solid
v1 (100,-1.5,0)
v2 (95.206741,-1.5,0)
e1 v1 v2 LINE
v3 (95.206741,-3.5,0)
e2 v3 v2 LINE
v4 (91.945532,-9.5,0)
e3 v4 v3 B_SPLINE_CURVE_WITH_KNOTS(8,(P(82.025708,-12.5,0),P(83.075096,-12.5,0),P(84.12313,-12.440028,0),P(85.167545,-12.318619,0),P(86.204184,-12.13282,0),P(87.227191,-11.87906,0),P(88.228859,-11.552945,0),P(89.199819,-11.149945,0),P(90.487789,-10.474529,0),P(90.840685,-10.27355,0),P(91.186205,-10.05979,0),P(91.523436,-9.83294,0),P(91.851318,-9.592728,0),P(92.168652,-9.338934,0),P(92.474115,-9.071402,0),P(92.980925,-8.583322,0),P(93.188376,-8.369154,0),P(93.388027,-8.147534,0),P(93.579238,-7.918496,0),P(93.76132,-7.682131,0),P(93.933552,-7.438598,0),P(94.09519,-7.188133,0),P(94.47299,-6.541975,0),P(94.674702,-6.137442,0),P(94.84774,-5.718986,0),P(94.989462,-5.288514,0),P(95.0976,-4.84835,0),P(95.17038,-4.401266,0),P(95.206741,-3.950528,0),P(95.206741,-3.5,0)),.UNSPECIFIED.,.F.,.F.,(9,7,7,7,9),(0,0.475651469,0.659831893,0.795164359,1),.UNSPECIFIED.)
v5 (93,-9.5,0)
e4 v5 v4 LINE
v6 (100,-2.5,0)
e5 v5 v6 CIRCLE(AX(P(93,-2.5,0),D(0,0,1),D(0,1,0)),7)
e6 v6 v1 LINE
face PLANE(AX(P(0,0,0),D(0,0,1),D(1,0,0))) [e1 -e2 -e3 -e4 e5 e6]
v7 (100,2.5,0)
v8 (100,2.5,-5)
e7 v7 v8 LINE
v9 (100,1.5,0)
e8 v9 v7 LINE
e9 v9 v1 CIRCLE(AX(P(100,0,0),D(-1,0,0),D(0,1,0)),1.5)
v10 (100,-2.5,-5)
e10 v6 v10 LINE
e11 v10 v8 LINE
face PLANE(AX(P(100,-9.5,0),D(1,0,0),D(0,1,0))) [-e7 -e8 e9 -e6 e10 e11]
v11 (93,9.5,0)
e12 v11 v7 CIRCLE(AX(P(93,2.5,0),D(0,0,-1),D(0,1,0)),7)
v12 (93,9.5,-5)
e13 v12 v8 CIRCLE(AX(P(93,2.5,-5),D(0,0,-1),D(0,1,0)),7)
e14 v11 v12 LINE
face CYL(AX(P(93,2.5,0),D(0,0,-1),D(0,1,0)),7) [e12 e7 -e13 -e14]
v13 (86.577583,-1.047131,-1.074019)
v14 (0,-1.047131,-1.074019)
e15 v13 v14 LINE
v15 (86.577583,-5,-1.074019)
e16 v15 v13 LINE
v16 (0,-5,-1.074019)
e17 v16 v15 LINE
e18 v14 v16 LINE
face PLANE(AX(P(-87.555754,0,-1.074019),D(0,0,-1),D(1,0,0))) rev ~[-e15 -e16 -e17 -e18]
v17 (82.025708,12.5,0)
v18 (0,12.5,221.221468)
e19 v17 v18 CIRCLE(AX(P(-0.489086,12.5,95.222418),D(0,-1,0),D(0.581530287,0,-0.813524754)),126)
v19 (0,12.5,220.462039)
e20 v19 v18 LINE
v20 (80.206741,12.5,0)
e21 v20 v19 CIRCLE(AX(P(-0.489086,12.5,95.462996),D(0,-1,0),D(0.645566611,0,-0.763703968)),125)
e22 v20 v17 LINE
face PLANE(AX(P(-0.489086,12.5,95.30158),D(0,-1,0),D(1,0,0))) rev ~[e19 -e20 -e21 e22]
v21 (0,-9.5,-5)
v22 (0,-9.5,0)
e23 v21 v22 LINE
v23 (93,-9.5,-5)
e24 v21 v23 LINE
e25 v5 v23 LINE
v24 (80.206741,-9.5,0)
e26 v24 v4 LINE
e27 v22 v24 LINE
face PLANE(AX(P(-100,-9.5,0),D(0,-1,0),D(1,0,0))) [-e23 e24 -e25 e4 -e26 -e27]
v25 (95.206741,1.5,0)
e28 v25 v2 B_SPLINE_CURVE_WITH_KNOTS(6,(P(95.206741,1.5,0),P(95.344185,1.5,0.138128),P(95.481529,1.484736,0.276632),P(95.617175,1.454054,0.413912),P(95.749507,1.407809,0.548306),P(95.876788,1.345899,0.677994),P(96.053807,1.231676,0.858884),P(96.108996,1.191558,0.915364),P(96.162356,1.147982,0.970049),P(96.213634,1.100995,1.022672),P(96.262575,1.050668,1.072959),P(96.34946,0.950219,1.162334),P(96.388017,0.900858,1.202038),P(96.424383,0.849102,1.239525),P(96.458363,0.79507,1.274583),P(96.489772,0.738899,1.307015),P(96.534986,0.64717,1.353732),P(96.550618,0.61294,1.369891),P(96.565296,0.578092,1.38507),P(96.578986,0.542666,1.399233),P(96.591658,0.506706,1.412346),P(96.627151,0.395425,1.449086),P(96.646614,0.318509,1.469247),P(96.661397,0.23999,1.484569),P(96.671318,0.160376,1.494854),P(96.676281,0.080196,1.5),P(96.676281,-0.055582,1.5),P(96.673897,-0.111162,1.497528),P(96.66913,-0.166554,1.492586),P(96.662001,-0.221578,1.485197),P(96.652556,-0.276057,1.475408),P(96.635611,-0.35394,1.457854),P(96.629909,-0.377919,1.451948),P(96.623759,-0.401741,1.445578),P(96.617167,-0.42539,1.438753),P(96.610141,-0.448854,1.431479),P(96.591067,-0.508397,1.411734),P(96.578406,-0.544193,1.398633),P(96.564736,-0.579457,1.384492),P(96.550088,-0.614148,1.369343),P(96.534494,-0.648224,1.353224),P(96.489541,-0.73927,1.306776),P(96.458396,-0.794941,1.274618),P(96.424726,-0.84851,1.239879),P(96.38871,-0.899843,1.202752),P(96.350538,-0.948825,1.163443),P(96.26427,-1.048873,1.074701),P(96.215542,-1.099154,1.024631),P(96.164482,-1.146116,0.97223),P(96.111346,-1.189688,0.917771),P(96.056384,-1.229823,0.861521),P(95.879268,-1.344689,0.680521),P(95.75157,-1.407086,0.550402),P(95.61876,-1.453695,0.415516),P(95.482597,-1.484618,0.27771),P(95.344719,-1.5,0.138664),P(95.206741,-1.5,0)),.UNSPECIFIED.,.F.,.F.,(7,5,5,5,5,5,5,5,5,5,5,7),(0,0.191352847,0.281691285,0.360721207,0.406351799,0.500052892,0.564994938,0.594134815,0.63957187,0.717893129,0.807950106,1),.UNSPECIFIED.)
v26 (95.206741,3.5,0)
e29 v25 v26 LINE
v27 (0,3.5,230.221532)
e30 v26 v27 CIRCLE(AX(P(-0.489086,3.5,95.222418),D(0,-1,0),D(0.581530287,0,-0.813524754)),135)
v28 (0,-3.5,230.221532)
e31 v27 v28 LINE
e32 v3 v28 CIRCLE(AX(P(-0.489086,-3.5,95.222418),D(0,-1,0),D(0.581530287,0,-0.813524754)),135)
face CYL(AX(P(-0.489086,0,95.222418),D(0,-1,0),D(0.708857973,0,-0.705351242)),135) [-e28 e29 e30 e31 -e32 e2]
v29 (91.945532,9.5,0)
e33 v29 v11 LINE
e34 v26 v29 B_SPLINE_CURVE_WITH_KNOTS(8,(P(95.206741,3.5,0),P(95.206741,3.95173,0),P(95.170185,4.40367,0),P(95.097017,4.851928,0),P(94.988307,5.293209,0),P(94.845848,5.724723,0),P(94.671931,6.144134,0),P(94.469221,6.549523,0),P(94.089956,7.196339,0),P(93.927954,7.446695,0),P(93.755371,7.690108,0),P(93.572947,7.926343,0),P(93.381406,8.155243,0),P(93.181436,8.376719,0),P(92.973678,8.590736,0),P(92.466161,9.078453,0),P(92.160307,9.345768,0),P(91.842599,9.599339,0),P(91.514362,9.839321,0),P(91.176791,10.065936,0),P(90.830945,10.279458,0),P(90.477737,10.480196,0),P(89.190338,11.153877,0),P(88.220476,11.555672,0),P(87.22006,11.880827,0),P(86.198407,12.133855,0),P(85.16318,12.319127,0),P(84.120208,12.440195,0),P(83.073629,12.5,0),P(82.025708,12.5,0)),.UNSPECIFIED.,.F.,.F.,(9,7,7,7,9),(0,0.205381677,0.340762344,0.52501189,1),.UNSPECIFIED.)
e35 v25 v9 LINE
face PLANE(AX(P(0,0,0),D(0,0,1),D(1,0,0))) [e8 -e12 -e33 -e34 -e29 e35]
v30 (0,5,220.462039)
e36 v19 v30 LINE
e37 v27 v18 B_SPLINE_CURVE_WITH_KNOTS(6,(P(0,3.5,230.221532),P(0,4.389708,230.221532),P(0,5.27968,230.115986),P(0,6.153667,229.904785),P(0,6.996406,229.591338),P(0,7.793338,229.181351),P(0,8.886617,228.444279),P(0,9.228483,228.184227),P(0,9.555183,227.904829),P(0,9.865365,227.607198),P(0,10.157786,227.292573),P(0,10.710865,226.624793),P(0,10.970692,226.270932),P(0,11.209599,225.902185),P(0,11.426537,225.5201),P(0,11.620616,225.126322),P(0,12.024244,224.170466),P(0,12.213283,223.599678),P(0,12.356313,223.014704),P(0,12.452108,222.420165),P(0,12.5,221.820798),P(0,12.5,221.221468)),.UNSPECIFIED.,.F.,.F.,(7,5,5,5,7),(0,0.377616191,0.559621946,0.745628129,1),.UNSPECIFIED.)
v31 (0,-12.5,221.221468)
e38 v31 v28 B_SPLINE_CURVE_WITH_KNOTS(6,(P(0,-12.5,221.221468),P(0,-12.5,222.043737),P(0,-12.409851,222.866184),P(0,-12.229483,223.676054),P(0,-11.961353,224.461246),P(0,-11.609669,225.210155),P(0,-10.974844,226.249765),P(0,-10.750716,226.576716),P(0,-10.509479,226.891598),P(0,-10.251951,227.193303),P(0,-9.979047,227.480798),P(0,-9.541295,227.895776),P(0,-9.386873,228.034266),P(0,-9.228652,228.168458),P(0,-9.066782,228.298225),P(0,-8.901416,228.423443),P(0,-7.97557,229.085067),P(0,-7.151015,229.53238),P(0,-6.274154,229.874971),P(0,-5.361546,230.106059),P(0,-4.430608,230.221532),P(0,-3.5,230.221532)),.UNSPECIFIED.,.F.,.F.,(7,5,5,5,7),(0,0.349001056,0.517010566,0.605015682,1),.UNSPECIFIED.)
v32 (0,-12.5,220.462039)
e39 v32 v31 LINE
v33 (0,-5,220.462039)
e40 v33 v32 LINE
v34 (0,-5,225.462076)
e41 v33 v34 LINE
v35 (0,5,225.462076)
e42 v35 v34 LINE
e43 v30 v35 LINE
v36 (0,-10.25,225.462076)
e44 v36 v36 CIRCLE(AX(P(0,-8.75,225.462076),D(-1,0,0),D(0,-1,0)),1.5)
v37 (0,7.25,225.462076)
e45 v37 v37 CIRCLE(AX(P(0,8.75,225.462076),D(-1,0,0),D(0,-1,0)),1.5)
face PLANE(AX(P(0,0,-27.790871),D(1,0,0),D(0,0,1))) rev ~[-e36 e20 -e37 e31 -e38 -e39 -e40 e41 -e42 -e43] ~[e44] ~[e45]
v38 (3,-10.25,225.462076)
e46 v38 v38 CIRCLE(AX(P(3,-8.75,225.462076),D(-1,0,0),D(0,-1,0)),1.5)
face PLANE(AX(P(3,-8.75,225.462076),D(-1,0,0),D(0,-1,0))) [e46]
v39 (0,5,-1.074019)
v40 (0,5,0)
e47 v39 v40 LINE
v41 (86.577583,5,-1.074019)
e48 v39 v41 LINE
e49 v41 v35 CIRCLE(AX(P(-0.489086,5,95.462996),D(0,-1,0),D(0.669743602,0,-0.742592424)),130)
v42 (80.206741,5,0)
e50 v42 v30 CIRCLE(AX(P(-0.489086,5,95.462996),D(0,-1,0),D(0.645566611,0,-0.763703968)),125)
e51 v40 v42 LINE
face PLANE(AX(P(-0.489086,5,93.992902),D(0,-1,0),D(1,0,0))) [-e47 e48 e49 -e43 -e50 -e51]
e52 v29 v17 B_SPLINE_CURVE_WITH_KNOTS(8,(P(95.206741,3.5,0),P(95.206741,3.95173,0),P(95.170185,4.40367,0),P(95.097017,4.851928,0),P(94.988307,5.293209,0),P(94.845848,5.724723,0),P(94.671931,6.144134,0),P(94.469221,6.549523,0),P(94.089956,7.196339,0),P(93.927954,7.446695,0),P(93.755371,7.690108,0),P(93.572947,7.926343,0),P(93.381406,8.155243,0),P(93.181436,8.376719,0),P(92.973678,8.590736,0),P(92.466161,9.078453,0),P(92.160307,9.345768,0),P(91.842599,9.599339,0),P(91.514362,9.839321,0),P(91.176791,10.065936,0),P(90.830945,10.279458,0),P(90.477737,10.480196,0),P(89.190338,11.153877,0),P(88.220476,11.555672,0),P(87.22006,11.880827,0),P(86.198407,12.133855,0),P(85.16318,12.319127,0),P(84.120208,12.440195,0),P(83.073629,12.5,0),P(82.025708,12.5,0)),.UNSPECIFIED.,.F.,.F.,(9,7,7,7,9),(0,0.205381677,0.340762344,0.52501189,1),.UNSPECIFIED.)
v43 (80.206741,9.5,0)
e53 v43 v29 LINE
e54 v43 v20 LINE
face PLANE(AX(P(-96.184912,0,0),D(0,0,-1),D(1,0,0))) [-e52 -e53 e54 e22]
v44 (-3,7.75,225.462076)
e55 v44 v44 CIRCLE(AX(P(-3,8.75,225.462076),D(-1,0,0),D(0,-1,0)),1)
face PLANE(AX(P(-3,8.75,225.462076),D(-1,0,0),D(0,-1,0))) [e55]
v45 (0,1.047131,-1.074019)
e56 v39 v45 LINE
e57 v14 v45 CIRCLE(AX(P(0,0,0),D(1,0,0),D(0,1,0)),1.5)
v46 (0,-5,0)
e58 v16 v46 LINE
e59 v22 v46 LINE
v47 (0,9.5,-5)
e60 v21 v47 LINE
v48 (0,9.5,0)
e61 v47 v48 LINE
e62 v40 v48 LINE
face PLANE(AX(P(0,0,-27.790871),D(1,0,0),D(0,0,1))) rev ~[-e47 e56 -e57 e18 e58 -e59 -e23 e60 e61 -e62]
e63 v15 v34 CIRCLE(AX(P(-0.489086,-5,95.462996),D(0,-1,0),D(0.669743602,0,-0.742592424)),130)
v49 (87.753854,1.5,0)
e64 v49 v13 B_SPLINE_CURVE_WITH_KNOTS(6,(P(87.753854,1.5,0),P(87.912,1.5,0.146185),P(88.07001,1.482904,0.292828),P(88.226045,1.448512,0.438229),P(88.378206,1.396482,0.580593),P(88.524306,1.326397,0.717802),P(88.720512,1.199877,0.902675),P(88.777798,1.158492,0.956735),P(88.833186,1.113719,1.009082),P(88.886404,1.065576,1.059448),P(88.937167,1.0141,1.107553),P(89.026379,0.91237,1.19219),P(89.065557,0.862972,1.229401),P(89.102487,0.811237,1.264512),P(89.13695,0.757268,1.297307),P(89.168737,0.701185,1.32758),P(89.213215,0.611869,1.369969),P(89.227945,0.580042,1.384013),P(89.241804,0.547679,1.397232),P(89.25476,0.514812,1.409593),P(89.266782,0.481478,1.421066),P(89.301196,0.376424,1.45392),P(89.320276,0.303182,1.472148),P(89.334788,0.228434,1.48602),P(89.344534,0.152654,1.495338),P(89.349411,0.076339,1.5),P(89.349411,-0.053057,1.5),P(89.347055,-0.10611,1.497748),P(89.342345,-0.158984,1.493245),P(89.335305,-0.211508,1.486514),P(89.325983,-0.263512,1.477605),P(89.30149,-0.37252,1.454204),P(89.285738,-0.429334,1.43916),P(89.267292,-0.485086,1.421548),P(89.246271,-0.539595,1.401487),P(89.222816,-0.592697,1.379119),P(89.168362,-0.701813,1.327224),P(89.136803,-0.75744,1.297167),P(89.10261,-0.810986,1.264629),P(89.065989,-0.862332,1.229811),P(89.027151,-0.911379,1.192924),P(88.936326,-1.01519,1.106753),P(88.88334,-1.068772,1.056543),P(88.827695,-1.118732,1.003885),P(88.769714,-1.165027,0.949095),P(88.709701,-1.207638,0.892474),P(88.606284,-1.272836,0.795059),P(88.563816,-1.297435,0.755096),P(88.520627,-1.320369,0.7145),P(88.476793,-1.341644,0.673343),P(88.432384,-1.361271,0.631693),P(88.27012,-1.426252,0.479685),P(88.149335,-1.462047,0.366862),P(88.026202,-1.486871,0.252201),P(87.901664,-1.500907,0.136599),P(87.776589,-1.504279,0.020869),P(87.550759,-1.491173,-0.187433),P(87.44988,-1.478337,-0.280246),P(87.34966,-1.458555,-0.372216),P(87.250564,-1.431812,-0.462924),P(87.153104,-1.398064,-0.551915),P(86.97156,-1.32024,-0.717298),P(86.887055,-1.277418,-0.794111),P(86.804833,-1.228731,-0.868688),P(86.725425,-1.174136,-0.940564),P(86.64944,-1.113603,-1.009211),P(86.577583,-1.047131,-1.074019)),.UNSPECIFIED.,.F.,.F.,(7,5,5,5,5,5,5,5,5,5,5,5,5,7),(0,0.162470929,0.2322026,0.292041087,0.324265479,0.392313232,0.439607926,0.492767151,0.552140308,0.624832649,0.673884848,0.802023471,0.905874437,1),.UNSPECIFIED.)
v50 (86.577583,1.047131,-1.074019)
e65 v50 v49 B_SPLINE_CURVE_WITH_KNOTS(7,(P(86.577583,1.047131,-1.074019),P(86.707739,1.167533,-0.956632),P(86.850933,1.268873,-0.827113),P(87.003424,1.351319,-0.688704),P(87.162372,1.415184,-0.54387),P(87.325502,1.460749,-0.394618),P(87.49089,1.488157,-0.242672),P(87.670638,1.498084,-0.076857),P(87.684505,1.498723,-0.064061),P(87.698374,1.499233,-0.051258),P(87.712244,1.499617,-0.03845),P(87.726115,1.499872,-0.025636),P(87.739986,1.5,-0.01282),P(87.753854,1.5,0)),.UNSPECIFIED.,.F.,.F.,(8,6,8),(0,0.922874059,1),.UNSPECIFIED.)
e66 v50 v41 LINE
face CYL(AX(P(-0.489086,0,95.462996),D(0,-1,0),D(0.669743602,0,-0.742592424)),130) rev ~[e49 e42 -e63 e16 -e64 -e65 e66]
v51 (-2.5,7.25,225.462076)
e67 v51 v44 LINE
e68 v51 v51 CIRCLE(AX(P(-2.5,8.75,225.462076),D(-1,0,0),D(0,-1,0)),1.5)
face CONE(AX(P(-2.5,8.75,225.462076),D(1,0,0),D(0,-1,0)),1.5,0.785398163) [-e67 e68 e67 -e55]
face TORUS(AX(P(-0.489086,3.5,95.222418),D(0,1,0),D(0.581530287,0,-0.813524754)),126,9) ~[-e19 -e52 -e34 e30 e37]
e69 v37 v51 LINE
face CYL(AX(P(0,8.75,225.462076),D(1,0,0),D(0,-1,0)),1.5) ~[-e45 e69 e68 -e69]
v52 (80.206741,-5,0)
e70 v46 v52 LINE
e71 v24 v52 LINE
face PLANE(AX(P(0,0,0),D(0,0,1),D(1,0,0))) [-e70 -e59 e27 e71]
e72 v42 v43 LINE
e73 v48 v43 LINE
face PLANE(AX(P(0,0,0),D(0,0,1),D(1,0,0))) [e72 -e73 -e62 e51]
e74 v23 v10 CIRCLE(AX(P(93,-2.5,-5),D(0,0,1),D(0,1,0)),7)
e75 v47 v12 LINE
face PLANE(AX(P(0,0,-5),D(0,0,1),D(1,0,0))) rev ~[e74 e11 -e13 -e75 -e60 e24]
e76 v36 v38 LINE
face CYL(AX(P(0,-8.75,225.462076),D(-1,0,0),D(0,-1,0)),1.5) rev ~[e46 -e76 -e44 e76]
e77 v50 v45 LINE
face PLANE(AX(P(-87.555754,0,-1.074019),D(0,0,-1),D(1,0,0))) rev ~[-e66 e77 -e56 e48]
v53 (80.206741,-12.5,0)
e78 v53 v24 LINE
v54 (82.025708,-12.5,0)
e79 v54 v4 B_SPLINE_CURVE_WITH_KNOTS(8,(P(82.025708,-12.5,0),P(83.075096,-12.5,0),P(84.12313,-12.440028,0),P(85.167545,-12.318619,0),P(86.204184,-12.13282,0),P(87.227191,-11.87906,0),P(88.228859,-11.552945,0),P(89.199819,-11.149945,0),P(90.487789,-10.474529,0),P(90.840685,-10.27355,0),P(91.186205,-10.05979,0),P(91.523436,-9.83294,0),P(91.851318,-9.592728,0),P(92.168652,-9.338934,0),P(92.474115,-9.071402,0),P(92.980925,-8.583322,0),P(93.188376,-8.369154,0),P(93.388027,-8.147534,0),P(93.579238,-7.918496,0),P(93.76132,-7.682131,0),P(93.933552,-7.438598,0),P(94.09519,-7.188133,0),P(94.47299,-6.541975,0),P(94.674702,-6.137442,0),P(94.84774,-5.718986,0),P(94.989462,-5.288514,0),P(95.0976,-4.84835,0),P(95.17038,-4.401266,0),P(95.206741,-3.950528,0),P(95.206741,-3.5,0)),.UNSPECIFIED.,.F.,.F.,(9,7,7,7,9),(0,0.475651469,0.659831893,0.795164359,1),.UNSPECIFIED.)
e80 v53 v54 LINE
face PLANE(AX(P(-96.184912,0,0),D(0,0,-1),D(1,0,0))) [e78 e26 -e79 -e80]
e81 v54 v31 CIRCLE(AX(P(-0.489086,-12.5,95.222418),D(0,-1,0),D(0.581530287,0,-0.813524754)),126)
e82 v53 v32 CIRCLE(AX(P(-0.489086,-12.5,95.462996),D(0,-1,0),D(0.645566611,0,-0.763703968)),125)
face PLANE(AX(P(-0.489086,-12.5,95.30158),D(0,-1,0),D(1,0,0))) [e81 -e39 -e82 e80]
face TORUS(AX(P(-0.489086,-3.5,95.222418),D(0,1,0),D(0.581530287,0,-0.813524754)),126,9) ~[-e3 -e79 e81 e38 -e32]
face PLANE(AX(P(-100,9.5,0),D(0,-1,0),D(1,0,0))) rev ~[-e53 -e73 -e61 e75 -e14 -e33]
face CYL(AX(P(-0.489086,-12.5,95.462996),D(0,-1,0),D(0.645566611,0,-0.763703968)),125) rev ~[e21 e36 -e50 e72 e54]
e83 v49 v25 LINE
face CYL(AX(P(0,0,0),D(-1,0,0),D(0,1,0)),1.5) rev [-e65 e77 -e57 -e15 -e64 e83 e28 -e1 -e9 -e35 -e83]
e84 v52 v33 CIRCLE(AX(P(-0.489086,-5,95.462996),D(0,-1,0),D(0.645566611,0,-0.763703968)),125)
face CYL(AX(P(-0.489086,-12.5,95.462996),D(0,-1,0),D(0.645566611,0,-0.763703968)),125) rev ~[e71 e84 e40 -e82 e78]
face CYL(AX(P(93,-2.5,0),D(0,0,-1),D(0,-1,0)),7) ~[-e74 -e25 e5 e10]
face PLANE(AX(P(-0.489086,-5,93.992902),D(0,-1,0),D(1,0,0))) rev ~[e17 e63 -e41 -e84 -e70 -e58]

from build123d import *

# Parameters (mm, degrees)
F1_DEPTH     = 12.5
F3_DEPTH     = 145
F4_W         = 200
F4_H         = 19
F5_DEPTH     = 5
F7_DEPTH     = 5
F8_R         = 1
F9_DEPTH     = 135.4900855741
F11_T3_ANGLE = 288.8835060345
F11_T7_ANGLE = 288.8835060345
F12_W        = 164.3678992987
F12_H        = 299.086984247
F13_DEPTH    = 15
F14_R        = 1.5
F15_DEPTH    = 3
F16_R        = 1.5
F17_DEPTH    = 3
F18_SIZE     = 0.5
F19_R        = 1.5
F20_DEPTH    = 134.5119145259
F21_R        = 7


# Not quite as in the source:
# - a fillet or chamfer that OpenCascade refuses, or shapes differently, is made with other operations: its cross-section is extruded or revolved along the edge and cut away or added


with BuildPart() as f1:
    # F0 (on Front) → F1 (new body, symmetric)
    with BuildSketch(Plane.XZ):
        with BuildLine():
            ThreePointArc((95.206740787, 0), (-0.4890855741, 230.2224176182), (-96.1849119353, 0))
            Line((-96.1849119353, 0), (95.206740787, 0))
        make_face()
    extrude(amount=F1_DEPTH, both=True)

    # F2 (on face) → F3 (cut, symmetric)
    with BuildSketch(Plane.XZ.offset(12.5)):
        with BuildLine():
            ThreePointArc((80.206740787, 0), (-0.4890855741, 220.4629960136), (-81.1849119353, 0))
            Line((-81.1849119353, 0), (80.206740787, 0))
        make_face()
    extrude(amount=F3_DEPTH, both=True, mode=Mode.SUBTRACT)

    # F4 (on Top) → F5 (join)
    with BuildSketch(Plane.XY):
        Rectangle(F4_W, F4_H)
    extrude(amount=-F5_DEPTH)

    # F6 (on Front) → F7 (cut, symmetric)
    with BuildSketch(Plane.XZ):
        with BuildLine():
            ThreePointArc((86.5775826458, -1.0740190898), (-0.4890855741, 225.4629960136), (-87.5557537941, -1.0740190898))
            Line((-87.5557537941, -1.0740190898), (86.5775826458, -1.0740190898))
        make_face()
    extrude(amount=F7_DEPTH, both=True, mode=Mode.SUBTRACT)

    # F8 (on Right) → F9 (cut, through all)
    with BuildSketch(Plane.YZ):
        Circle(F8_R)
    extrude(amount=-F9_DEPTH, mode=Mode.SUBTRACT)

    # F11: fillet of radius 9 on 2 edges, made by hand


with BuildPart() as f11_tool1:
    # F11_s2 → F11_t3 (revolve)
    with BuildSketch(Plane(origin=(44.7250174756, 0, 31.9706955431), x_dir=(0, 1, 0), z_dir=(-0.8135247542, 0, -0.5815302867))):
        with BuildLine():
            ThreePointArc((-12.5, 48.2497880385), (-9.8639610307, 54.6137490692), (-3.5, 57.2497880385))
            Line((-3.5, 57.2497880385), (-3.5, 57.4297880385))
            Line((-3.5, 57.4297880385), (-12.68, 57.4297880385))
            Line((-12.68, 57.4297880385), (-12.68, 48.2497880385))
            Line((-12.68, 48.2497880385), (-12.5, 48.2497880385))
        make_face()
    revolve(axis=Axis((-0.4890855741, -12.5, 95.2224176182), (0, -1, 0)), revolution_arc=F11_T3_ANGLE)

    split(bisect_by=Plane.XY, keep=Keep.TOP)


with BuildPart() as f11_tool5:
    # F11_s6 → F11_t7 (revolve)
    with BuildSketch(Plane(origin=(44.7250174756, 0, 31.9706955431), x_dir=(0, 1, 0), z_dir=(-0.8135247542, 0, -0.5815302867))):
        with BuildLine():
            ThreePointArc((3.5, 57.2497880385), (9.8639610307, 54.6137490692), (12.5, 48.2497880385))
            Line((12.5, 48.2497880385), (12.68, 48.2497880385))
            Line((12.68, 48.2497880385), (12.68, 57.4297880385))
            Line((12.68, 57.4297880385), (3.5, 57.4297880385))
            Line((3.5, 57.4297880385), (3.5, 57.2497880385))
        make_face()
    revolve(axis=Axis((-0.4890855741, 12.5, 95.2224176182), (0, -1, 0)), revolution_arc=F11_T7_ANGLE)

    split(bisect_by=Plane.XY, keep=Keep.TOP)


with BuildPart() as f1_1:
    add(f1.part)

    # F11_t9: cut F11_tool1, F11_tool5
    add([f11_tool1.part, f11_tool5.part], mode=Mode.SUBTRACT)

    # F12 (on Front) → F13 (cut, symmetric)
    with BuildSketch(Plane.XZ):
        with Locations((-82.1839496493, 121.752621606)):
            Rectangle(F12_W, F12_H)
    extrude(amount=F13_DEPTH, both=True, mode=Mode.SUBTRACT)

    # F14 (on face) → F15 (join)
    with BuildSketch(Plane(origin=(0, 0, 0), x_dir=(0, -1, 0), z_dir=(-1, 0, 0))):
        with Locations((-8.75, 225.4620759923)):
            Circle(F14_R)
    extrude(amount=F15_DEPTH)

    # F16 (on face) → F17 (cut)
    with BuildSketch(Plane(origin=(0, 0, 0), x_dir=(0, -1, 0), z_dir=(-1, 0, 0))):
        with Locations((8.75, 225.4620759923)):
            Circle(F16_R)
    extrude(amount=-F17_DEPTH, mode=Mode.SUBTRACT)

    # F18
    f18_edges = [f1_1.edges().sort_by_distance(p)[0] for p in [
        (-3, 10.25, 225.462076),
    ]]
    chamfer(f18_edges, length=F18_SIZE)

    # F19 (on Right) → F20 (cut, through all)
    with BuildSketch(Plane.YZ):
        Circle(F19_R)
    extrude(amount=F20_DEPTH, mode=Mode.SUBTRACT)

    # F21
    f21_edges = [f1_1.edges().sort_by_distance(p)[0] for p in [
        (100, 9.5, -2.5),
        (100, -9.5, -2.5),
    ]]
    fillet(f21_edges, radius=F21_R)


solid = f1_1.part
